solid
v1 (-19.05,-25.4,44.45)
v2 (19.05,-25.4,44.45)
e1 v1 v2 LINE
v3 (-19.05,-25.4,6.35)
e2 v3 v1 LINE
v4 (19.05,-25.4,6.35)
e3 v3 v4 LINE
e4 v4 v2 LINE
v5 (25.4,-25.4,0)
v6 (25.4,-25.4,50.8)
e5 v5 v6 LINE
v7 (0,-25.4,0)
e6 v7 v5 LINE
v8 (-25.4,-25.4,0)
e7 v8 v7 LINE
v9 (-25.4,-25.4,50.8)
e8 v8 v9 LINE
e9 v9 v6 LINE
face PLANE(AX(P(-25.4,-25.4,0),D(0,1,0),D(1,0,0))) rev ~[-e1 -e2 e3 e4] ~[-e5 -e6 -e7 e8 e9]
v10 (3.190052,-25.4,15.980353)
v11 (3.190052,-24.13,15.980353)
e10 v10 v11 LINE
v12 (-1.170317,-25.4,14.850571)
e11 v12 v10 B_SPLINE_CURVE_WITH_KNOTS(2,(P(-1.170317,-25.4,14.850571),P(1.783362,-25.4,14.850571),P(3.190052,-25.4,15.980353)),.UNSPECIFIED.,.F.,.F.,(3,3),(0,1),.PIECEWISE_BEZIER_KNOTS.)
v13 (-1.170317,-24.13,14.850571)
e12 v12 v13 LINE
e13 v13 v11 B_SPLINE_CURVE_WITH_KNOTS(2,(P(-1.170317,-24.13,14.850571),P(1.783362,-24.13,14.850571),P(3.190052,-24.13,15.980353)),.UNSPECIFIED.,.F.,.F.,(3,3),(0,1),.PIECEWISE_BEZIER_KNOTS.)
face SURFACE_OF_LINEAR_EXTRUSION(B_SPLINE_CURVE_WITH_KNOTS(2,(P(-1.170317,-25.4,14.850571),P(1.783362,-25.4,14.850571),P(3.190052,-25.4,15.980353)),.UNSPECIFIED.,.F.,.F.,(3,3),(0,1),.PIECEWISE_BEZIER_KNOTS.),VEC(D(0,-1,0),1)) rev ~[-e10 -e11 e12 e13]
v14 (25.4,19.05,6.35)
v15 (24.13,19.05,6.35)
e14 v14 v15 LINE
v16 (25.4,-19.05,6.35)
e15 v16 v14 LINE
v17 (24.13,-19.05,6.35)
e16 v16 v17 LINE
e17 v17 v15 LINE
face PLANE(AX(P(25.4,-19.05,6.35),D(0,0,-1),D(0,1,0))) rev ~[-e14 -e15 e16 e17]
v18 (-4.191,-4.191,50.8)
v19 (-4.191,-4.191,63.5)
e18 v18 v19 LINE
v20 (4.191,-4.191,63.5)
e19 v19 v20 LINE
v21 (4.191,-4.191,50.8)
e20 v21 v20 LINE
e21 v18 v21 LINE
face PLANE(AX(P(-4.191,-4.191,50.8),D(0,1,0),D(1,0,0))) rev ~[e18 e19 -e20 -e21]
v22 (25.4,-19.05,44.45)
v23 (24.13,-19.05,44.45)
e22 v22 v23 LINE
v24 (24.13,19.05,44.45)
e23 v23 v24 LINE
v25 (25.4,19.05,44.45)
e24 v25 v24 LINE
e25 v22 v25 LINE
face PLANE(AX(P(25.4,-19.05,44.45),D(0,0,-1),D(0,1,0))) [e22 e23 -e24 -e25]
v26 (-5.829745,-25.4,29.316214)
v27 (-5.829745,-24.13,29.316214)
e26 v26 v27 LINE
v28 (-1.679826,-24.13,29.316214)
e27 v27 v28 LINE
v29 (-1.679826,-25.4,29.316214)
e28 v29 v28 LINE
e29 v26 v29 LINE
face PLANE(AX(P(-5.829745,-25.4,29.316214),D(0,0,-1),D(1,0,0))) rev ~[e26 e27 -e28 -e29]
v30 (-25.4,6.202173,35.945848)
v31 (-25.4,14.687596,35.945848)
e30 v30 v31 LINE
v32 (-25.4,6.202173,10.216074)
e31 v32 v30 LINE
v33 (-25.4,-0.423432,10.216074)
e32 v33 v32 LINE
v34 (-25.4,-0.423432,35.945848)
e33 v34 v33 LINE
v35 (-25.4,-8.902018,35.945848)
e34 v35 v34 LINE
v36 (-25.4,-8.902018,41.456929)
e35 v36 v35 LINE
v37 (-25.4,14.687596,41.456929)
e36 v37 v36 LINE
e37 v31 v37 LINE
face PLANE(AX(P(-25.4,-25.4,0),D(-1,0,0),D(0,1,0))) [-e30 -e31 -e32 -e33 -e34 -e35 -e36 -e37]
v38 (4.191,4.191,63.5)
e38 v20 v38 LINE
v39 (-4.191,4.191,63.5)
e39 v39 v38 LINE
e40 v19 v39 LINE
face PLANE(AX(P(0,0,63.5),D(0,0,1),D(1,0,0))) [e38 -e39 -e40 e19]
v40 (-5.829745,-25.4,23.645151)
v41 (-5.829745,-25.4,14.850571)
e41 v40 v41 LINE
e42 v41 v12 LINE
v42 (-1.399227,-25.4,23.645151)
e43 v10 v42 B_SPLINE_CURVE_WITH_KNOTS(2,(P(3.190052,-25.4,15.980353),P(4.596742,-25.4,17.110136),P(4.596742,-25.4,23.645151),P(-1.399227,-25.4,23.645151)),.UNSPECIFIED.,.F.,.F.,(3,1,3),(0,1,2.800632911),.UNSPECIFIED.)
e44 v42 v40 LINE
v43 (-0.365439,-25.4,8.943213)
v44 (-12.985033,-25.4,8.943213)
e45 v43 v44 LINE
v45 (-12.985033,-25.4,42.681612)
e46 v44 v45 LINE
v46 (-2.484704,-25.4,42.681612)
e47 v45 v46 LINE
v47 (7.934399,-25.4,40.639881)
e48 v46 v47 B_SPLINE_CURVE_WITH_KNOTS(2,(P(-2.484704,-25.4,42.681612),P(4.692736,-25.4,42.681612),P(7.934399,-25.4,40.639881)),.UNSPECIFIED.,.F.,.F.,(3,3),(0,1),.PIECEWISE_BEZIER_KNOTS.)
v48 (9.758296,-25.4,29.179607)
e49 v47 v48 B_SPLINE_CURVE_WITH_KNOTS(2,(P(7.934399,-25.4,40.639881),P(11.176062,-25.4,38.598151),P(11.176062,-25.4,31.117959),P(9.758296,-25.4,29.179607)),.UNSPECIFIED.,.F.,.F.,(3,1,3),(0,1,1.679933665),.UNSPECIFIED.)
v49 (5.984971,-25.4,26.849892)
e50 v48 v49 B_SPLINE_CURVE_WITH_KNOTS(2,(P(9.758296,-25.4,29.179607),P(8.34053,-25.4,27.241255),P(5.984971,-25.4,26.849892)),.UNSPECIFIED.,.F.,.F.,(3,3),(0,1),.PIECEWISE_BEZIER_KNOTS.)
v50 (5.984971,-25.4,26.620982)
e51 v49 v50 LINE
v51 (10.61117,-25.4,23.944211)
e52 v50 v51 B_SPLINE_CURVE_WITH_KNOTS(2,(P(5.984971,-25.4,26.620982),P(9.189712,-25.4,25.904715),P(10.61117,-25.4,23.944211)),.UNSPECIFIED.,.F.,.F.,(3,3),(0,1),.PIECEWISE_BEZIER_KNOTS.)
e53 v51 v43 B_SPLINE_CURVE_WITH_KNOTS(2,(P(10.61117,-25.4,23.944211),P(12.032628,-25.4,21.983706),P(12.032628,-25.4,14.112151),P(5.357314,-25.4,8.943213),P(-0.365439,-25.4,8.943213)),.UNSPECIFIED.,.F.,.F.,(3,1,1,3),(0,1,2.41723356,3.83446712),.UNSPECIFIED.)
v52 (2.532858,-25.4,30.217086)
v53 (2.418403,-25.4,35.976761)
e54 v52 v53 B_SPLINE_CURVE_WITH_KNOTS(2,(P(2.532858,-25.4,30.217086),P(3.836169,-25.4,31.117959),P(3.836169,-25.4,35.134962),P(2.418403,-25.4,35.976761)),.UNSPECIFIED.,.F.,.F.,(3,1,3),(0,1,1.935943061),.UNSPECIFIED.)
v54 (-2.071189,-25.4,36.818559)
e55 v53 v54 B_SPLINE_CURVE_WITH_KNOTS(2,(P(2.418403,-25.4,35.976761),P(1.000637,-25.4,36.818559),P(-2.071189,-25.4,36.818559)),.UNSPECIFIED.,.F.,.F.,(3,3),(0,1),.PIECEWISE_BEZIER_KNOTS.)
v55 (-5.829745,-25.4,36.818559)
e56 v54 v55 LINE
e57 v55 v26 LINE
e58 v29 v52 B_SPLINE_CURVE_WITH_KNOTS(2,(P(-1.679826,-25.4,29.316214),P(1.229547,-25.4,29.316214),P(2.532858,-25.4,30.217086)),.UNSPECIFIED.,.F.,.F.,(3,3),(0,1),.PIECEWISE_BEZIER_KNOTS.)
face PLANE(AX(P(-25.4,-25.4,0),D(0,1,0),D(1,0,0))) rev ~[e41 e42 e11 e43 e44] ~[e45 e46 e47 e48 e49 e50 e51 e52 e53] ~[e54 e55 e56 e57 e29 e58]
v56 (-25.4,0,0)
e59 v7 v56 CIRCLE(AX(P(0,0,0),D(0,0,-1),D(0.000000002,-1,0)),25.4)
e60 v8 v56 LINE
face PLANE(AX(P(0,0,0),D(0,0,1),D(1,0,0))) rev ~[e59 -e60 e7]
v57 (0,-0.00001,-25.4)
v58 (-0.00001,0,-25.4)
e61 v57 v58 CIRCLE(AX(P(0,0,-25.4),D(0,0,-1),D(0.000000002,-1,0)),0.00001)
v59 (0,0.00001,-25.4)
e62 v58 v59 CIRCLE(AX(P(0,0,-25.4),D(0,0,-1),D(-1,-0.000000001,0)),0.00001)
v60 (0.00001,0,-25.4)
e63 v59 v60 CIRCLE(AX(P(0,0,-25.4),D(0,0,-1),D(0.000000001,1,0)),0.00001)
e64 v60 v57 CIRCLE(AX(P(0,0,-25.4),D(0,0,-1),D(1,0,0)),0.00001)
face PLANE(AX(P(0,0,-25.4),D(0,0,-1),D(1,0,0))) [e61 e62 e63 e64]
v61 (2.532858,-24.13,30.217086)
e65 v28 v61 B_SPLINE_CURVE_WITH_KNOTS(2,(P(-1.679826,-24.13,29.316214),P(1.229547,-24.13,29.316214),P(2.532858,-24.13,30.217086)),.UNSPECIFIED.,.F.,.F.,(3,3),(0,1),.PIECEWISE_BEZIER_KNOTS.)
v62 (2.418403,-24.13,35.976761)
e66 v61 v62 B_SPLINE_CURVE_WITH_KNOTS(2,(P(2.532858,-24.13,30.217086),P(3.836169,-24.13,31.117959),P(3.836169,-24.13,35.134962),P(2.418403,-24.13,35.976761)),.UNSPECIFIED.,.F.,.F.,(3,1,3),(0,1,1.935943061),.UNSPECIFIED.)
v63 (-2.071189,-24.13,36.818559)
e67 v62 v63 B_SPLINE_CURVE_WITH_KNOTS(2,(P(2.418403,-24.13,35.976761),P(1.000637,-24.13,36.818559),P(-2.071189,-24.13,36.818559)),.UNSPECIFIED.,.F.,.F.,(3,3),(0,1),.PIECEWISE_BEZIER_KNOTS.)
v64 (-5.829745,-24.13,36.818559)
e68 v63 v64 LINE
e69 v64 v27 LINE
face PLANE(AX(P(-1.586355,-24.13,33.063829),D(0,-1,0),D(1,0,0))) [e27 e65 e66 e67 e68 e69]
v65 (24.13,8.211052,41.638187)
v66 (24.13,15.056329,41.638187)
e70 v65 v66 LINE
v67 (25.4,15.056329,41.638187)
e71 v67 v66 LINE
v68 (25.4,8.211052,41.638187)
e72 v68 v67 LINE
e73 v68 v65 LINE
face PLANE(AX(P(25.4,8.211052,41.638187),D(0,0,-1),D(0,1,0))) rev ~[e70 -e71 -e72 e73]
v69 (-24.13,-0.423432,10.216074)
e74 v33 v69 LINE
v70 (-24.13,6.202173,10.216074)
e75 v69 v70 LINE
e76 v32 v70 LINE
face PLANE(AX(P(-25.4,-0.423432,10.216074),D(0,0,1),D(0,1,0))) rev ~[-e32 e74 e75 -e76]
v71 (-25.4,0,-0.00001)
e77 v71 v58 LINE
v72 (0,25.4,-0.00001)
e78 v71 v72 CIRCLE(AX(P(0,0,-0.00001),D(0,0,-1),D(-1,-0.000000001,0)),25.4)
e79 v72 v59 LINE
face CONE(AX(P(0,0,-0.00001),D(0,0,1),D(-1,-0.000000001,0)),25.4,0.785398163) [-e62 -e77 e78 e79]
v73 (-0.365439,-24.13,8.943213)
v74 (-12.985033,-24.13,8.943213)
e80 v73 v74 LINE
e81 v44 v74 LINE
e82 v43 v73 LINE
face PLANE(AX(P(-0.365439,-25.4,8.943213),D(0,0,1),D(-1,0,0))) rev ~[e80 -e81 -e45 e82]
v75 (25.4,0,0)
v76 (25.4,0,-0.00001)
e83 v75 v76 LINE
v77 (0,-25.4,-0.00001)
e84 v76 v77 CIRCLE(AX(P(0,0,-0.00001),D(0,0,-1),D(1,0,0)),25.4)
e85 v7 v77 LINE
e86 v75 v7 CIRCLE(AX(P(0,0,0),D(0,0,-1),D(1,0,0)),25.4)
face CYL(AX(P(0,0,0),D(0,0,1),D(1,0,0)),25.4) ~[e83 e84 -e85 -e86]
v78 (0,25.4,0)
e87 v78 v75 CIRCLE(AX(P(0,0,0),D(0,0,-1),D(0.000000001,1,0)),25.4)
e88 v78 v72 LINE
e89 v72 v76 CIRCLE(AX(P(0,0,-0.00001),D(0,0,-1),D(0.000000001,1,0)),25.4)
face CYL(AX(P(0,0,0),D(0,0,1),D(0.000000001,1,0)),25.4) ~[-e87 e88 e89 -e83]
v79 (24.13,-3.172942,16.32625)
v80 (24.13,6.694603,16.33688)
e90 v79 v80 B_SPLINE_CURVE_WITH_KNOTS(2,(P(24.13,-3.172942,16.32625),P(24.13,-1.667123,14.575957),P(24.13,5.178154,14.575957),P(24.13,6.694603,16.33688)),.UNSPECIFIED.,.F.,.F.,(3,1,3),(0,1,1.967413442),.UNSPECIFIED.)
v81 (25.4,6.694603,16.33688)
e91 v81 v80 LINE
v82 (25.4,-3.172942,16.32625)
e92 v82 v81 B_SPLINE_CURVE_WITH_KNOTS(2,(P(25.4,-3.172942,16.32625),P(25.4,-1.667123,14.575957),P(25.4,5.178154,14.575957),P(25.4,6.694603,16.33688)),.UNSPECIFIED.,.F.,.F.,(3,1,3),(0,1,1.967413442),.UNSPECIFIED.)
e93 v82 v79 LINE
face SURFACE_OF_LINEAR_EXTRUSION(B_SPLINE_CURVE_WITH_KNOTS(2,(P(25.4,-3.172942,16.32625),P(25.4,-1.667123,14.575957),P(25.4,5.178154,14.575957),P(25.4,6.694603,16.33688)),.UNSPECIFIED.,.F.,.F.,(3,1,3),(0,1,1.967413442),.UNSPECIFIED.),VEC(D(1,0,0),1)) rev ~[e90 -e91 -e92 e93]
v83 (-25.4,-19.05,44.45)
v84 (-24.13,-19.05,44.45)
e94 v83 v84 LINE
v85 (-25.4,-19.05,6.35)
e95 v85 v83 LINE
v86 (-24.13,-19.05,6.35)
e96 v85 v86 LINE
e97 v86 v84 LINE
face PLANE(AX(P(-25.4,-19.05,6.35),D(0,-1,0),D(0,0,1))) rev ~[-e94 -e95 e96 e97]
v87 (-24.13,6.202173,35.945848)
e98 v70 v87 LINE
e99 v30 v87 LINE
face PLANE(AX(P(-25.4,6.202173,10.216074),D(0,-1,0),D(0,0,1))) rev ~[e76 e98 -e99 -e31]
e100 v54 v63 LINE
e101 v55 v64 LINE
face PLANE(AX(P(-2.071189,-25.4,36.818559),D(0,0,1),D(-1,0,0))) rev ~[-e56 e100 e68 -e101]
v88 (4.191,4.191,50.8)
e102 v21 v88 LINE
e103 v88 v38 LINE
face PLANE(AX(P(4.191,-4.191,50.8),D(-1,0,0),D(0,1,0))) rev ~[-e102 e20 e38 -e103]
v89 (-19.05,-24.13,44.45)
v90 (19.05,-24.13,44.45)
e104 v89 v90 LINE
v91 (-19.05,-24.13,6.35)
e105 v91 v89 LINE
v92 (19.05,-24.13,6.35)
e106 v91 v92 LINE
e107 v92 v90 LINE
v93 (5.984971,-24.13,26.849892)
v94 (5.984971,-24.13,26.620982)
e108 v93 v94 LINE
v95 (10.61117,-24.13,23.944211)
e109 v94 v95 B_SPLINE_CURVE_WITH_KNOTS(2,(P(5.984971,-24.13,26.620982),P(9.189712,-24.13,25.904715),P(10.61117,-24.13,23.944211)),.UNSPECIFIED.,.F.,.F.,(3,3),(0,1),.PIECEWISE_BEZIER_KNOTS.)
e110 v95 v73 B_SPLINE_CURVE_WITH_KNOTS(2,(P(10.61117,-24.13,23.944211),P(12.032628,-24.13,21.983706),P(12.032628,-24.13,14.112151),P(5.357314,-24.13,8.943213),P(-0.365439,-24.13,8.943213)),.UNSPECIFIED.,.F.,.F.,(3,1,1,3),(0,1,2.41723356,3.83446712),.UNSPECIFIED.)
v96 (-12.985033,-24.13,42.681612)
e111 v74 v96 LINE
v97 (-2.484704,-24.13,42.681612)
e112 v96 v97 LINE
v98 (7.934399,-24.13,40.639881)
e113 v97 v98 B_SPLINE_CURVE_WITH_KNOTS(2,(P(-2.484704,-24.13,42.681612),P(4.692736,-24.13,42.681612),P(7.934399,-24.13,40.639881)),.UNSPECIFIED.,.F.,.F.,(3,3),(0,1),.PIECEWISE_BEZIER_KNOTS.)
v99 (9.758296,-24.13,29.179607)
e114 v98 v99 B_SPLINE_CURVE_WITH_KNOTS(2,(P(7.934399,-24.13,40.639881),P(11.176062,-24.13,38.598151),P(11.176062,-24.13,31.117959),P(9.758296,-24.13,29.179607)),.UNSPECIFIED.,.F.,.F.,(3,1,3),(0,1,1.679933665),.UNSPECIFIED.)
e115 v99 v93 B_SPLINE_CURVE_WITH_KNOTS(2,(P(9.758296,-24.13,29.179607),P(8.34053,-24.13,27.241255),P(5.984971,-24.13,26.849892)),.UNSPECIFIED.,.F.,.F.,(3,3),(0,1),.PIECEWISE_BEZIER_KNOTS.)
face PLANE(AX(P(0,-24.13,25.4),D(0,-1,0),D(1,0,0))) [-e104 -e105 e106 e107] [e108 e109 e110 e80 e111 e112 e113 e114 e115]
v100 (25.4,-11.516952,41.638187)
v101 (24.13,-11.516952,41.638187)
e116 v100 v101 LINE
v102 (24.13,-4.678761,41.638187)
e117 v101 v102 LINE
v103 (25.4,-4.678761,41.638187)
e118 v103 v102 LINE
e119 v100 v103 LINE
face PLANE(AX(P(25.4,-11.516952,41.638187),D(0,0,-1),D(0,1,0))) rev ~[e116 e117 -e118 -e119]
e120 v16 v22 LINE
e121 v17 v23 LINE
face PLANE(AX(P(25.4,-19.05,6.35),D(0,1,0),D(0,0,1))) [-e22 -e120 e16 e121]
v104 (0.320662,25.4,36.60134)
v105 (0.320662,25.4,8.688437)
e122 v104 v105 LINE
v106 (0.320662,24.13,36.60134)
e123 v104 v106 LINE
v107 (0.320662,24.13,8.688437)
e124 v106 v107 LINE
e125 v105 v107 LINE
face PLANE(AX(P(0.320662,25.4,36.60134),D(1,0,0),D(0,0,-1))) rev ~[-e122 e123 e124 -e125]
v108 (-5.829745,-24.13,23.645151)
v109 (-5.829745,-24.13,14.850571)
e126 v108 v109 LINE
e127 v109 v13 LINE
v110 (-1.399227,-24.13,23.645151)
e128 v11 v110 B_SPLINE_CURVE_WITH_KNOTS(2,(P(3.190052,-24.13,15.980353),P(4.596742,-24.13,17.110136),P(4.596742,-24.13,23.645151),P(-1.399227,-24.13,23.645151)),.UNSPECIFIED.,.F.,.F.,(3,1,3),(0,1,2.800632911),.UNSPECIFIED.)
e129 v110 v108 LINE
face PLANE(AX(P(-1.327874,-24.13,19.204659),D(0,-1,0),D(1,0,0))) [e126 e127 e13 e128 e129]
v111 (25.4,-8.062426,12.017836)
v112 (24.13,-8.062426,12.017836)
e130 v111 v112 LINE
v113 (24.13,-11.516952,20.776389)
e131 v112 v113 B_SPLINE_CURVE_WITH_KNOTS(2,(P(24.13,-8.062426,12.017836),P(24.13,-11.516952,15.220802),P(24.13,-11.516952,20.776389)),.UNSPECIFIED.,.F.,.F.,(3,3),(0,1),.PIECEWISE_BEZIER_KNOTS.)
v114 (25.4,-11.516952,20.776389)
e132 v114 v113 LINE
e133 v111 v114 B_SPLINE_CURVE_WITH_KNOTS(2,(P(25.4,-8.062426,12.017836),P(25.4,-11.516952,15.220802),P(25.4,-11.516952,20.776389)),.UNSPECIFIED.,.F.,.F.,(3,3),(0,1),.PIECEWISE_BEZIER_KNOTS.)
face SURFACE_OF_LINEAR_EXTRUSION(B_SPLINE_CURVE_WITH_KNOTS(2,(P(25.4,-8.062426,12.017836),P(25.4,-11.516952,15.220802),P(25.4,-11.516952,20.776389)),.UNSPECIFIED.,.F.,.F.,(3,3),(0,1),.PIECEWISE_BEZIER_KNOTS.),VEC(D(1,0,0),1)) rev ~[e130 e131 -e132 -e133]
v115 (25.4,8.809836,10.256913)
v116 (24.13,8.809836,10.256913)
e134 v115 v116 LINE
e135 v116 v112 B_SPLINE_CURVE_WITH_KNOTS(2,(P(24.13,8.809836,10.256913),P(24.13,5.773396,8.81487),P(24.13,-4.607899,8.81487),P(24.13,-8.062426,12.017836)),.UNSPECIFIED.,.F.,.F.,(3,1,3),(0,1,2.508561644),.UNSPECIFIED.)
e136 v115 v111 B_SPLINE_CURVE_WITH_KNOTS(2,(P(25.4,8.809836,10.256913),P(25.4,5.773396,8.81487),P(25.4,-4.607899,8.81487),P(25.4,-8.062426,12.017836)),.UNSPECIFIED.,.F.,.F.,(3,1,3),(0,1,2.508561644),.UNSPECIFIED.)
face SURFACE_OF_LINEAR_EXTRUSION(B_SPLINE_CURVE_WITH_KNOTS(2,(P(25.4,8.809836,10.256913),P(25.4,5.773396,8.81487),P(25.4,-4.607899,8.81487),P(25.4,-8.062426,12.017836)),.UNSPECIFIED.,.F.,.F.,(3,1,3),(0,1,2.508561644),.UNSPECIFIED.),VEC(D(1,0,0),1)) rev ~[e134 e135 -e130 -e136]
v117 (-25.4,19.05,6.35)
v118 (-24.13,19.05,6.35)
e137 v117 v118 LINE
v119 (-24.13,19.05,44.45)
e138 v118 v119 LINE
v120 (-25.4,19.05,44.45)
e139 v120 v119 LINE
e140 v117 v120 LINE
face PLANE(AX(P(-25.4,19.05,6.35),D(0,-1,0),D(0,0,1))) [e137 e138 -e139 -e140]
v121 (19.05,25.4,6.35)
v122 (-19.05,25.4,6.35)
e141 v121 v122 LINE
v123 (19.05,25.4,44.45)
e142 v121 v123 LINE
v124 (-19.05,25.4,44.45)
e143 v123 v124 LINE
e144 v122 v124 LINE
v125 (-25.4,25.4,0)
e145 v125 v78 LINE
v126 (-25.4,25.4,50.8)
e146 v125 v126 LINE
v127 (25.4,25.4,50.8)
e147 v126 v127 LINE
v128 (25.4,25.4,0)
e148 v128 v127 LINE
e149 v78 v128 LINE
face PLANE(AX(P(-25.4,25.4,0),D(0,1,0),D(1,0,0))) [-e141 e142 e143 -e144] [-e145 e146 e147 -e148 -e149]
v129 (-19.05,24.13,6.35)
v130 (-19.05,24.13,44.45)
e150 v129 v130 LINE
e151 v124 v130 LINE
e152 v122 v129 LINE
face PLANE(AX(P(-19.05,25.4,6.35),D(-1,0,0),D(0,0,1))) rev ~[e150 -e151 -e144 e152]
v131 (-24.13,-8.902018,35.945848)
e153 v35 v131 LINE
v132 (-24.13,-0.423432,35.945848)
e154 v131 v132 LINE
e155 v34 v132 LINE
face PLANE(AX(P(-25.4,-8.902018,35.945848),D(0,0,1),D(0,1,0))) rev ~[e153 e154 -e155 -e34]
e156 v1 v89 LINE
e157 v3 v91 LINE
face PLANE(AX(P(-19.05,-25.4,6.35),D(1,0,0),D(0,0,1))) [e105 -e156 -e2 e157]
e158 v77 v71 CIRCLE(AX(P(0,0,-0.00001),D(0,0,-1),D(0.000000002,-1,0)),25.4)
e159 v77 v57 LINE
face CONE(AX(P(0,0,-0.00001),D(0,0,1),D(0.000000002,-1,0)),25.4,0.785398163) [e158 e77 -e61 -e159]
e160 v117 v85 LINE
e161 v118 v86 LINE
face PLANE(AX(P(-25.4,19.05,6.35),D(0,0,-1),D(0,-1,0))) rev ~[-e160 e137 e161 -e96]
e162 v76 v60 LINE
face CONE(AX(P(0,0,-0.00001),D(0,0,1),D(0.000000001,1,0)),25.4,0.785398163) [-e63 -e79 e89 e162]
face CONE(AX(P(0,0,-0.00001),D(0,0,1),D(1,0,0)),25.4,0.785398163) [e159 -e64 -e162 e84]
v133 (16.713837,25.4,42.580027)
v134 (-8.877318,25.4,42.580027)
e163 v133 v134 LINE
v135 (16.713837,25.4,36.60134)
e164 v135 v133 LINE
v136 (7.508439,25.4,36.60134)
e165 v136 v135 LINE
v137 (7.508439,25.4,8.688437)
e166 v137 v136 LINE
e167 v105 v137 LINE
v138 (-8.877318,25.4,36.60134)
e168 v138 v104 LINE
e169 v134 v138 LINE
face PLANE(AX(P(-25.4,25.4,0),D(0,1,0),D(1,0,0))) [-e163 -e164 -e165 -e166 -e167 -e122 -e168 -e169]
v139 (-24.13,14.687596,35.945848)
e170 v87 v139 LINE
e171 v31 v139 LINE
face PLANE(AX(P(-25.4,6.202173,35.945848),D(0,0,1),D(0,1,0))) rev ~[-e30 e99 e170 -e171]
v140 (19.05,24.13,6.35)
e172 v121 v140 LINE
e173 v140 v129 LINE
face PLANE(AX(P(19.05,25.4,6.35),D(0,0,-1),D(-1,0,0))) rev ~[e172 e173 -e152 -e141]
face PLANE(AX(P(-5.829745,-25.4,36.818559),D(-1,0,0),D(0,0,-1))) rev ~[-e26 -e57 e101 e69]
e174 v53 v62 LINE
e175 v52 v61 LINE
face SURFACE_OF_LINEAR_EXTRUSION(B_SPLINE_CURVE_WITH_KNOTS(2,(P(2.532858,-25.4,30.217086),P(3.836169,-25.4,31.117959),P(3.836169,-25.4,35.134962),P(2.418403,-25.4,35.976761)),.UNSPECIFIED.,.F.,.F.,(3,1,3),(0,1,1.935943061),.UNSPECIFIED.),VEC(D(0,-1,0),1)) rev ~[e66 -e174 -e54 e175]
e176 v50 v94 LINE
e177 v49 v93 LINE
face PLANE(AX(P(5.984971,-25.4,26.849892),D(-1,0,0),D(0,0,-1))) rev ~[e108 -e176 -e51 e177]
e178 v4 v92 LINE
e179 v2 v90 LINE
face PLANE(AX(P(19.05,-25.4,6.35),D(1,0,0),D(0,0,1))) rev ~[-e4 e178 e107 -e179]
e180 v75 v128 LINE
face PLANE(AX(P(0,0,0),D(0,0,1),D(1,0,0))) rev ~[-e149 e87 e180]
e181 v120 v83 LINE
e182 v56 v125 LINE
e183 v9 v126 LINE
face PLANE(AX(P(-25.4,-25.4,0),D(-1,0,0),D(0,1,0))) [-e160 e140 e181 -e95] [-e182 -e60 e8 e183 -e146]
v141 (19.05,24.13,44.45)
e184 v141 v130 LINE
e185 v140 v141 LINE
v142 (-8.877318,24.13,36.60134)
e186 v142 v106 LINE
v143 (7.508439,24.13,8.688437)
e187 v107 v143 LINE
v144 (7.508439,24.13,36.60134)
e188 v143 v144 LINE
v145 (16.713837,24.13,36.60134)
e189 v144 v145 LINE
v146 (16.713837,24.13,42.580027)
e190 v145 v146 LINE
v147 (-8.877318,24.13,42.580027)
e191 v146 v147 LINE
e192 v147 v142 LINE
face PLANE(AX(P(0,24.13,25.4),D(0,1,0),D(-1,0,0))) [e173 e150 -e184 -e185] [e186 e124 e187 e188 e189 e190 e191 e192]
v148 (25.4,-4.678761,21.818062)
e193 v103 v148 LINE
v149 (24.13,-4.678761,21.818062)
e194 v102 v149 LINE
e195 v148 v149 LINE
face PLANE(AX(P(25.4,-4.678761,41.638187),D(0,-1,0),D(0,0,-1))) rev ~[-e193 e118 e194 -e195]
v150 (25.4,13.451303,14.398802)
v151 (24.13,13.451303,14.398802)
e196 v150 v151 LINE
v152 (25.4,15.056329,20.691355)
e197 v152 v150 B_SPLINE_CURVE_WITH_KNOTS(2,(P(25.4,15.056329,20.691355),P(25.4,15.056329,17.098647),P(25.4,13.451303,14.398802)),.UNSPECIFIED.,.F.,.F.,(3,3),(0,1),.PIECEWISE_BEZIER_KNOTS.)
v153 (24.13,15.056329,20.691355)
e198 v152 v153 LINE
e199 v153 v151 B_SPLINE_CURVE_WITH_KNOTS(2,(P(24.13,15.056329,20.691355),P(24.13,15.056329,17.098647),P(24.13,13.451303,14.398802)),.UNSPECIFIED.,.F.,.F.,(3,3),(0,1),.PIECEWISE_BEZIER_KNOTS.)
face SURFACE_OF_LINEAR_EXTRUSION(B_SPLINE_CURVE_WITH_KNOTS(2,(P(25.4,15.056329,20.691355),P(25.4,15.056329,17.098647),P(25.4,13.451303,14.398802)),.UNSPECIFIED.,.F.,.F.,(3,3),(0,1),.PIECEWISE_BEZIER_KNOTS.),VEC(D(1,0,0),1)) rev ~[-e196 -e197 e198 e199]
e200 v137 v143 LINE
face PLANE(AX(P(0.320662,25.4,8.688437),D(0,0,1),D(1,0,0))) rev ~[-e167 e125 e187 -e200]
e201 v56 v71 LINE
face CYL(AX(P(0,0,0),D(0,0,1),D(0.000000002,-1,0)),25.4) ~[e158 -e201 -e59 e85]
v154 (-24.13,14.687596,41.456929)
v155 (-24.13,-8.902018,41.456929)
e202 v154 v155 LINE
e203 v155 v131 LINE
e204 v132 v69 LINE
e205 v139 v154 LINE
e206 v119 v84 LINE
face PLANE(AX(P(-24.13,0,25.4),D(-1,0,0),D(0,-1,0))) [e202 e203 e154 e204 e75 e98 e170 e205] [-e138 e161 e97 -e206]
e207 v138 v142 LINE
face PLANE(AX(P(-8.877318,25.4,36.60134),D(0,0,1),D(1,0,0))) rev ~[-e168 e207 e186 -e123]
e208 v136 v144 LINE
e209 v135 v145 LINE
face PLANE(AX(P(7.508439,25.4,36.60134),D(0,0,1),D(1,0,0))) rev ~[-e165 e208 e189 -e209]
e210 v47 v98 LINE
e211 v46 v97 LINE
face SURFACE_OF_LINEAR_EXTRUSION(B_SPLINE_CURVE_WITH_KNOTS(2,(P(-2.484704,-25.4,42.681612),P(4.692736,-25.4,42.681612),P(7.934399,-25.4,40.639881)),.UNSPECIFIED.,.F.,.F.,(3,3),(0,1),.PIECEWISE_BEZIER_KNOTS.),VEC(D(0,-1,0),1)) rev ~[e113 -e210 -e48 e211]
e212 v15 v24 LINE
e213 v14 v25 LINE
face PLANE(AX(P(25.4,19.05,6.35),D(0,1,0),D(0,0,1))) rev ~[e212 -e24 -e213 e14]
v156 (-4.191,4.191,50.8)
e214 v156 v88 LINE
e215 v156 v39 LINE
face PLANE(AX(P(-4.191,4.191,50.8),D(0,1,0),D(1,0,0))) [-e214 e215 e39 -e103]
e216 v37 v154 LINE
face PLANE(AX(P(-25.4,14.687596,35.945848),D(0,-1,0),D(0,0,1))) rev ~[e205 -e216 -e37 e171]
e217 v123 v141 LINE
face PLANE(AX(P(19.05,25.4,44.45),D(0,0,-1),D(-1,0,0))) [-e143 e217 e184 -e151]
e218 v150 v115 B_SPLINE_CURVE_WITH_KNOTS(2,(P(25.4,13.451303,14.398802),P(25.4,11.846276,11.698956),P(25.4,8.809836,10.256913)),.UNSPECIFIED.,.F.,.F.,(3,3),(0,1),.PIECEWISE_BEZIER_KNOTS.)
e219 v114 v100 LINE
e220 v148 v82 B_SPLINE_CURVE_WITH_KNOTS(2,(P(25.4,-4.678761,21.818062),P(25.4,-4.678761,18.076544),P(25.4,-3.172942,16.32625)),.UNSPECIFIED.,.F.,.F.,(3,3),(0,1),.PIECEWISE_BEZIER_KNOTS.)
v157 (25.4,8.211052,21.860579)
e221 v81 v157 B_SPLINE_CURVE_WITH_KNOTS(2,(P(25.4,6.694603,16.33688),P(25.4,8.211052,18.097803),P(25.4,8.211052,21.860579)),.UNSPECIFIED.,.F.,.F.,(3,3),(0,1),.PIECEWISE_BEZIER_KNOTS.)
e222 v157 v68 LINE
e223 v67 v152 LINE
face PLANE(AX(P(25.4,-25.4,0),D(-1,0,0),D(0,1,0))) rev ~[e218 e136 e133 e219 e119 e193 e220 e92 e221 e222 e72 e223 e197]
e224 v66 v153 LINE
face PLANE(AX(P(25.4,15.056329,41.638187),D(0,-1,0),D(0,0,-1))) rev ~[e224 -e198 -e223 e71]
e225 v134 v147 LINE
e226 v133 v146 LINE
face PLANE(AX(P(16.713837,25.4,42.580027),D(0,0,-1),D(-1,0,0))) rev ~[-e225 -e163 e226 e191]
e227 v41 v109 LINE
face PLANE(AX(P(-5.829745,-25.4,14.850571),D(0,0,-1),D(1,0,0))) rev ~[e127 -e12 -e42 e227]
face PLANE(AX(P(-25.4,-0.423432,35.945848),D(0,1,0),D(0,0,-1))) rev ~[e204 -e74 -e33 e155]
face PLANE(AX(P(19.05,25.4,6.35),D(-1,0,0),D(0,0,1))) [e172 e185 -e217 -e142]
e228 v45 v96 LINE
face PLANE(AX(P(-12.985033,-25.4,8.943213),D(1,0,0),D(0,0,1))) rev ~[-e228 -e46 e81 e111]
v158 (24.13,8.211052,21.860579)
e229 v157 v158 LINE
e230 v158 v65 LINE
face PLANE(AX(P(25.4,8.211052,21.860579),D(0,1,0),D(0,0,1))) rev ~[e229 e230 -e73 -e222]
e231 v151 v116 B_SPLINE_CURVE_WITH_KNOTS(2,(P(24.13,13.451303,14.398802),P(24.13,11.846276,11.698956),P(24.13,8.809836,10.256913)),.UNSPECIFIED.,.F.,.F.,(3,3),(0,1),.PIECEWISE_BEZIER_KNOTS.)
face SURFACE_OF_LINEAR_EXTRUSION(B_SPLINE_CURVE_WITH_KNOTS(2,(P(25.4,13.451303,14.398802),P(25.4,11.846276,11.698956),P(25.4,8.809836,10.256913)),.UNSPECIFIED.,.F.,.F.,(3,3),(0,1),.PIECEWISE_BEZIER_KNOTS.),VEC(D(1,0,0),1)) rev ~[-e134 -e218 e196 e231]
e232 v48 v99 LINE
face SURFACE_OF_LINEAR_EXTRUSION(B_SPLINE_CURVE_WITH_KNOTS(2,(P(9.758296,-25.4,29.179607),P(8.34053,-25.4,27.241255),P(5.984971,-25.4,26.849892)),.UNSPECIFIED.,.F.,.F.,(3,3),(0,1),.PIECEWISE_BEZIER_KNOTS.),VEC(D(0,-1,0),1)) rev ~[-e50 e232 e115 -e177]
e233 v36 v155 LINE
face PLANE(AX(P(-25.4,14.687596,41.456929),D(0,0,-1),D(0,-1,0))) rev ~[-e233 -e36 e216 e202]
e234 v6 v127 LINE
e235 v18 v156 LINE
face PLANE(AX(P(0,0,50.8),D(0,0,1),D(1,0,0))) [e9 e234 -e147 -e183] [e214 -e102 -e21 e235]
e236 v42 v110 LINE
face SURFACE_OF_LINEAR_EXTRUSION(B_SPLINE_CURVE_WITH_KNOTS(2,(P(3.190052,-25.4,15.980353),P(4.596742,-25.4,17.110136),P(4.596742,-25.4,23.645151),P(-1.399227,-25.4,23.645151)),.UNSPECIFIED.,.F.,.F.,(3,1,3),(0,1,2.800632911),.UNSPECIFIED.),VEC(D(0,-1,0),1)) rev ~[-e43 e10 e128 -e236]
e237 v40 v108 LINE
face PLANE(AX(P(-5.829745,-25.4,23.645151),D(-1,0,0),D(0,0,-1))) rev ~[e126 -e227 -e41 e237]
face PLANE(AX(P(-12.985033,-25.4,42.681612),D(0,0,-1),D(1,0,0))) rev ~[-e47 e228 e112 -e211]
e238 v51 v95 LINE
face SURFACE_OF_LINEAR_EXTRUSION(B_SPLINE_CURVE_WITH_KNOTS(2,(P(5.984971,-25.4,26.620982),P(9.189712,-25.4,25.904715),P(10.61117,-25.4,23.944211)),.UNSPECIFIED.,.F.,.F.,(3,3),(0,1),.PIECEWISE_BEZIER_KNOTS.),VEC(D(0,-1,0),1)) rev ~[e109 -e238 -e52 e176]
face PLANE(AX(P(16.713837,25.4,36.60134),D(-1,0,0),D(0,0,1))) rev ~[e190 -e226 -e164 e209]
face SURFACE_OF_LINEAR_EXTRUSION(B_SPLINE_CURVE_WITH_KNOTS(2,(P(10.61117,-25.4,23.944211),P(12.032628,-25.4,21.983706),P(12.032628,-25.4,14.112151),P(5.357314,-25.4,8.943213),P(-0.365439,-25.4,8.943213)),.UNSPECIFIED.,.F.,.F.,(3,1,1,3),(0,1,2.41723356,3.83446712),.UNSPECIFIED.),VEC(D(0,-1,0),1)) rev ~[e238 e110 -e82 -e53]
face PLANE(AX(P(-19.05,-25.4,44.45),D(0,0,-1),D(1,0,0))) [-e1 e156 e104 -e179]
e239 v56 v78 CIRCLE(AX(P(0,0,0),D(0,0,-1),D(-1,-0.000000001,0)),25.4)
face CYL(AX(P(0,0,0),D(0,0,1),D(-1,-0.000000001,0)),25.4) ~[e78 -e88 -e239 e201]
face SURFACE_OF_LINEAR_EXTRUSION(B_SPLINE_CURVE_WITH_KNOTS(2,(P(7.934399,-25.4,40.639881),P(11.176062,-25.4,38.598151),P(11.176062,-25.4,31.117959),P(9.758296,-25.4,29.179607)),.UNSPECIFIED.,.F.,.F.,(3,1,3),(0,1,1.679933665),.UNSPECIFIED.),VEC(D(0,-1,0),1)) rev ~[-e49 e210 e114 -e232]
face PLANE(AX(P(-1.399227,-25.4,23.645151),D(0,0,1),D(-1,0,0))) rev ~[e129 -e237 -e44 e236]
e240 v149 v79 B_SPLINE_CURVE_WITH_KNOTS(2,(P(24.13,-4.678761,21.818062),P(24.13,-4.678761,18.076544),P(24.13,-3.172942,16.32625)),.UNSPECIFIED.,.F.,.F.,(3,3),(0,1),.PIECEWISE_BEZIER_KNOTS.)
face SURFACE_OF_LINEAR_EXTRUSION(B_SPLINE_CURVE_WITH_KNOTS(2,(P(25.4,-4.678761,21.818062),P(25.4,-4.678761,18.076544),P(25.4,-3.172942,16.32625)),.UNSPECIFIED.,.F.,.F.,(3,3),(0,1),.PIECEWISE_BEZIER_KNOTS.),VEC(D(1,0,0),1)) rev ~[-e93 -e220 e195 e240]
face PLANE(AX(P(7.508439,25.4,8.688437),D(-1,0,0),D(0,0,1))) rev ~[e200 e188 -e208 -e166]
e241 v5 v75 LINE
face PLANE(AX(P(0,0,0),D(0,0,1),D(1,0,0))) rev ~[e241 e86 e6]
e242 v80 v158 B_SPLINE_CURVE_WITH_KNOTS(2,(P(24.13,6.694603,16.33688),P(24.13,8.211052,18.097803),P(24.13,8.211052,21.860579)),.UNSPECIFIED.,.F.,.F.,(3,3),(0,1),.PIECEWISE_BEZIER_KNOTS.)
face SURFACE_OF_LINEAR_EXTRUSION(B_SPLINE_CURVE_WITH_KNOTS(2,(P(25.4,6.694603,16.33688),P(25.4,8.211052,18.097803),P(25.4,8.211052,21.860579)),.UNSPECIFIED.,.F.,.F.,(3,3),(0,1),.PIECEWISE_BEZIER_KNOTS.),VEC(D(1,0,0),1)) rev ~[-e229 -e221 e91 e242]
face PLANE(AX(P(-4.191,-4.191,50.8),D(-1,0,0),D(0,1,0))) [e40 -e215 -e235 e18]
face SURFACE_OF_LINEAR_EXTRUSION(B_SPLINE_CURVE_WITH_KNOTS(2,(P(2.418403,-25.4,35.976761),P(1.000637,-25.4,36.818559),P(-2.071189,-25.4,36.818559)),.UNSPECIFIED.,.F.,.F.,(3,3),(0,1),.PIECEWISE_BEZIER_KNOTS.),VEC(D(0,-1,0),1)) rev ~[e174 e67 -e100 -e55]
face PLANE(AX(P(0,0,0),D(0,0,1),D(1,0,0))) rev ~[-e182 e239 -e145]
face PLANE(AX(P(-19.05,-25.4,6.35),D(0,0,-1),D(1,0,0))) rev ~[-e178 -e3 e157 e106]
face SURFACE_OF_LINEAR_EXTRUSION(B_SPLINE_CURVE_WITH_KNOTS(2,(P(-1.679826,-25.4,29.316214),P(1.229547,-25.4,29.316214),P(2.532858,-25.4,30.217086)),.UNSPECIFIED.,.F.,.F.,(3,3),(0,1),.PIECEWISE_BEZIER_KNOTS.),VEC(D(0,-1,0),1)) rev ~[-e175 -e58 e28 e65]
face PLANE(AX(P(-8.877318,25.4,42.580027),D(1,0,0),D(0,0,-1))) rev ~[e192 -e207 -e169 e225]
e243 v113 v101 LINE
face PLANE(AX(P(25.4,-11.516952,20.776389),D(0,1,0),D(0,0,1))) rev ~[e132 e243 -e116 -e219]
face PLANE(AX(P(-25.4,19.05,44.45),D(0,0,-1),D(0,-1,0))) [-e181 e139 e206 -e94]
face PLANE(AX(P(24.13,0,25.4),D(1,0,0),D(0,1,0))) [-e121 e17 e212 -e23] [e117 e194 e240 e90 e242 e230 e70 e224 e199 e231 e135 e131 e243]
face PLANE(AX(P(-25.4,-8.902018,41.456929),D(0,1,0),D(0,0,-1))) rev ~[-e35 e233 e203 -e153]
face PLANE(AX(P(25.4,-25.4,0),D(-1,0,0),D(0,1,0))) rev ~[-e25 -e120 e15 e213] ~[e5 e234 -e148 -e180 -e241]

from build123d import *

# Parameters (mm, degrees)
F0_W      = 50.8
F0_H      = 50.8
F1_DEPTH  = 50.8
F2_W      = 38.1
F2_H      = 38.1
F3_DEPTH  = 1.27
F4_W      = 38.1
F4_H      = 38.1
F5_DEPTH  = 1.27
F6_W      = 38.1
F6_H      = 38.1
F7_DEPTH  = 1.27
F8_W      = 38.1
F8_H      = 38.1
F9_DEPTH  = 1.27
F10_W     = 8.382
F10_H     = 8.382
F11_DEPTH = 12.7
F13_DEPTH = 25.4
F14_SIZE  = 25.39999


# Not quite as in the source:
# - a fillet or chamfer is up to 0.001 mm smaller than in the source, because OpenCascade refuses the exact size


with BuildPart() as f1:
    # F0 (on Top) → F1 (new body)
    with BuildSketch(Plane.XY):
        Rectangle(F0_W, F0_H)
    extrude(amount=F1_DEPTH)

    # F2 (on face) → F3 (cut)
    with BuildSketch(Plane.XZ.offset(25.4)):
        with Locations((0, 25.4)):
            Rectangle(F2_W, F2_H)
        with BuildLine():
            Line((-12.9850329568, 8.9432131499), (-12.9850329568, 42.6816119349))
            Line((-12.9850329568, 42.6816119349), (-2.484703985, 42.6816119349))
            add(Edge.make_bspline(
                [(-2.484703985, 42.6816119349), (4.6927360717, 42.6816119349), (7.9343988133, 40.6398813015)],
                knots=[0, 0, 0, 1, 1, 1], degree=2))
            add(Edge.make_bspline(
                [(7.9343988133, 40.6398813015), (11.176061555, 38.5981506681), (11.176061555, 34.1454795218)],
                knots=[0, 0, 0, 1, 1, 1], degree=2))
            add(Edge.make_bspline(
                [(11.176061555, 34.1454795218), (11.176061555, 31.1179585102), (9.7582956179, 29.1796066431)],
                knots=[0, 0, 0, 1, 1, 1], degree=2))
            add(Edge.make_bspline(
                [(9.7582956179, 29.1796066431), (8.3405296807, 27.2412547759), (5.9849706498, 26.8498923037)],
                knots=[0, 0, 0, 1, 1, 1], degree=2))
            Line((5.9849706498, 26.8498923037), (5.9849706498, 26.6209821784))
            add(Edge.make_bspline(
                [(5.9849706498, 26.6209821784), (9.1897124035, 25.9047150123), (10.6111704394, 23.9442105523)],
                knots=[0, 0, 0, 1, 1, 1], degree=2))
            add(Edge.make_bspline(
                [(10.6111704394, 23.9442105523), (12.0326284753, 21.9837060924), (12.0326284753, 18.7272749556)],
                knots=[0, 0, 0, 1, 1, 1], degree=2))
            add(Edge.make_bspline(
                [(12.0326284753, 18.7272749556), (12.0326284753, 14.1121514623), (8.694971165, 11.5276823061)],
                knots=[0, 0, 0, 1, 1, 1], degree=2))
            add(Edge.make_bspline(
                [(8.694971165, 11.5276823061), (5.3573138547, 8.9432131499), (-0.3654392769, 8.9432131499)],
                knots=[0, 0, 0, 1, 1, 1], degree=2))
            Line((-0.3654392769, 8.9432131499), (-12.9850329568, 8.9432131499))
        make_face(mode=Mode.SUBTRACT)
        with BuildLine():
            Line((-5.8297454929, 36.8185590491), (-5.8297454929, 29.3162142985))
            Line((-5.8297454929, 29.3162142985), (-1.6798264478, 29.3162142985))
            add(Edge.make_bspline(
                [(-1.6798264478, 29.3162142985), (1.2295474023, 29.3162142985), (2.5328582768, 30.2170864044)],
                knots=[0, 0, 0, 1, 1, 1], degree=2))
            add(Edge.make_bspline(
                [(2.5328582768, 30.2170864044), (3.8361691513, 31.1179585102), (3.8361691513, 33.1929180328)],
                knots=[0, 0, 0, 1, 1, 1], degree=2))
            add(Edge.make_bspline(
                [(3.8361691513, 33.1929180328), (3.8361691513, 35.1349619988), (2.4184032142, 35.9767605239)],
                knots=[0, 0, 0, 1, 1, 1], degree=2))
            add(Edge.make_bspline(
                [(2.4184032142, 35.9767605239), (1.0006372771, 36.8185590491), (-2.07118892, 36.8185590491)],
                knots=[0, 0, 0, 1, 1, 1], degree=2))
            Line((-2.07118892, 36.8185590491), (-5.8297454929, 36.8185590491))
        make_face()
        with BuildLine():
            Line((-1.3992269394, 23.64515055), (-5.8297454929, 23.64515055))
            Line((-5.8297454929, 23.64515055), (-5.8297454929, 14.8505712213))
            Line((-5.8297454929, 14.8505712213), (-1.1703168141, 14.8505712213))
            add(Edge.make_bspline(
                [(-1.1703168141, 14.8505712213), (1.7833622215, 14.8505712213), (3.1900518623, 15.9803534524)],
                knots=[0, 0, 0, 1, 1, 1], degree=2))
            add(Edge.make_bspline(
                [(3.1900518623, 15.9803534524), (4.596741503, 17.1101356836), (4.596741503, 19.4435421217)],
                knots=[0, 0, 0, 1, 1, 1], degree=2))
            add(Edge.make_bspline(
                [(4.596741503, 19.4435421217), (4.596741503, 23.64515055), (-1.3992269394, 23.64515055)],
                knots=[0, 0, 0, 1, 1, 1], degree=2))
        make_face()
    extrude(amount=-F3_DEPTH, mode=Mode.SUBTRACT)

    # F4 (on face) → F5 (cut)
    with BuildSketch(Plane.YZ.offset(25.4)):
        with Locations((0, 25.4)):
            Rectangle(F4_W, F4_H)
        with BuildLine():
            Line((8.2110515278, 41.6381866004), (15.0563287647, 41.6381866004))
            Line((15.0563287647, 41.6381866004), (15.0563287647, 20.6913548071))
            add(Edge.make_bspline(
                [(15.0563287647, 20.6913548071), (15.0563287647, 17.098647189), (13.4513025803, 14.3988018192)],
                knots=[0, 0, 0, 1, 1, 1], degree=2))
            add(Edge.make_bspline(
                [(13.4513025803, 14.3988018192), (11.8462763959, 11.6989564493), (8.8098361308, 10.2569130563)],
                knots=[0, 0, 0, 1, 1, 1], degree=2))
            add(Edge.make_bspline(
                [(8.8098361308, 10.2569130563), (5.7733958658, 8.8148696632), (1.6350502071, 8.8148696632)],
                knots=[0, 0, 0, 1, 1, 1], degree=2))
            add(Edge.make_bspline(
                [(1.6350502071, 8.8148696632), (-4.6078993227, 8.8148696632), (-8.0624258786, 12.0178358237)],
                knots=[0, 0, 0, 1, 1, 1], degree=2))
            add(Edge.make_bspline(
                [(-8.0624258786, 12.0178358237), (-11.5169524345, 15.2208019843), (-11.5169524345, 20.776389307)],
                knots=[0, 0, 0, 1, 1, 1], degree=2))
            Line((-11.5169524345, 20.776389307), (-11.5169524345, 41.6381866004))
            Line((-11.5169524345, 41.6381866004), (-4.6787614059, 41.6381866004))
            Line((-4.6787614059, 41.6381866004), (-4.6787614059, 21.81806193))
            add(Edge.make_bspline(
                [(-4.6787614059, 21.81806193), (-4.6787614059, 18.0765439371), (-3.1729421379, 16.3262504822)],
                knots=[0, 0, 0, 1, 1, 1], degree=2))
            add(Edge.make_bspline(
                [(-3.1729421379, 16.3262504822), (-1.66712287, 14.5759570272), (1.8122054151, 14.5759570272)],
                knots=[0, 0, 0, 1, 1, 1], degree=2))
            add(Edge.make_bspline(
                [(1.8122054151, 14.5759570272), (5.178154367, 14.5759570272), (6.6946029474, 16.3368797946)],
                knots=[0, 0, 0, 1, 1, 1], degree=2))
            add(Edge.make_bspline(
                [(6.6946029474, 16.3368797946), (8.2110515278, 18.0978025621), (8.2110515278, 21.8605791799)],
                knots=[0, 0, 0, 1, 1, 1], degree=2))
            Line((8.2110515278, 21.8605791799), (8.2110515278, 41.6381866004))
        make_face(mode=Mode.SUBTRACT)
    extrude(amount=-F5_DEPTH, mode=Mode.SUBTRACT)

    # F6 (on face) → F7 (cut)
    with BuildSketch(Plane(origin=(0, 25.4, 0), x_dir=(-1, 0, 0), z_dir=(0, 1, 0))):
        with Locations((0, 25.4)):
            Rectangle(F6_W, F6_H)
        Polygon((-0.3206622132, 36.6013397979), (-0.3206622132, 8.6884368211), (-7.5084387172, 8.6884368211), (-7.5084387172, 36.6013397979), (-16.713836696, 36.6013397979), (-16.713836696, 42.5800269622), (8.8773180396, 42.5800269622), (8.8773180396, 36.6013397979), align=None, mode=Mode.SUBTRACT)
    extrude(amount=-F7_DEPTH, mode=Mode.SUBTRACT)

    # F8 (on face) → F9 (cut)
    with BuildSketch(Plane(origin=(-25.4, 0, 0), x_dir=(0, -1, 0), z_dir=(-1, 0, 0))):
        with Locations((0, 25.4)):
            Rectangle(F8_W, F8_H)
        Polygon((0.4234320166, 35.945847888), (0.4234320166, 10.2160740644), (-6.2021727762, 10.2160740644), (-6.2021727762, 35.945847888), (-14.6875964581, 35.945847888), (-14.6875964581, 41.4569288611), (8.902018129, 41.4569288611), (8.902018129, 35.945847888), align=None, mode=Mode.SUBTRACT)
    extrude(amount=-F9_DEPTH, mode=Mode.SUBTRACT)

    # F10 (on face) → F11 (join)
    with BuildSketch(Plane.XY.offset(50.8)):
        Rectangle(F10_W, F10_H)
    extrude(amount=F11_DEPTH)

    # F12 (on face) → F13 (join)
    with BuildSketch(Plane(origin=(0, 0, 0), x_dir=(1, 0, 0), z_dir=(0, 0, -1))):
        with BuildLine():
            ThreePointArc((3.01e-08, -25.4), (17.9605122528, -17.9605122315), (25.4, 0))
            ThreePointArc((25.4, 0), (17.9605122594, 17.9605122249), (4.89e-08, 25.4))
            ThreePointArc((4.89e-08, 25.4), (-17.9605122127, 17.9605122716), (-25.4, 3.44e-08))
            ThreePointArc((-25.4, 3.44e-08), (-17.9605122437, -17.9605122406), (3.01e-08, -25.4))
        make_face()
    extrude(amount=F13_DEPTH)

    # F14 (size 25.4 in the source; OpenCascade refuses exactly that, so slightly less here)
    f14_edges = [f1.edges().sort_by_distance(p)[0] for p in [
        (0, -25.4, -25.4),
    ]]
    chamfer(f14_edges, length=F14_SIZE)


solid = f1.part
